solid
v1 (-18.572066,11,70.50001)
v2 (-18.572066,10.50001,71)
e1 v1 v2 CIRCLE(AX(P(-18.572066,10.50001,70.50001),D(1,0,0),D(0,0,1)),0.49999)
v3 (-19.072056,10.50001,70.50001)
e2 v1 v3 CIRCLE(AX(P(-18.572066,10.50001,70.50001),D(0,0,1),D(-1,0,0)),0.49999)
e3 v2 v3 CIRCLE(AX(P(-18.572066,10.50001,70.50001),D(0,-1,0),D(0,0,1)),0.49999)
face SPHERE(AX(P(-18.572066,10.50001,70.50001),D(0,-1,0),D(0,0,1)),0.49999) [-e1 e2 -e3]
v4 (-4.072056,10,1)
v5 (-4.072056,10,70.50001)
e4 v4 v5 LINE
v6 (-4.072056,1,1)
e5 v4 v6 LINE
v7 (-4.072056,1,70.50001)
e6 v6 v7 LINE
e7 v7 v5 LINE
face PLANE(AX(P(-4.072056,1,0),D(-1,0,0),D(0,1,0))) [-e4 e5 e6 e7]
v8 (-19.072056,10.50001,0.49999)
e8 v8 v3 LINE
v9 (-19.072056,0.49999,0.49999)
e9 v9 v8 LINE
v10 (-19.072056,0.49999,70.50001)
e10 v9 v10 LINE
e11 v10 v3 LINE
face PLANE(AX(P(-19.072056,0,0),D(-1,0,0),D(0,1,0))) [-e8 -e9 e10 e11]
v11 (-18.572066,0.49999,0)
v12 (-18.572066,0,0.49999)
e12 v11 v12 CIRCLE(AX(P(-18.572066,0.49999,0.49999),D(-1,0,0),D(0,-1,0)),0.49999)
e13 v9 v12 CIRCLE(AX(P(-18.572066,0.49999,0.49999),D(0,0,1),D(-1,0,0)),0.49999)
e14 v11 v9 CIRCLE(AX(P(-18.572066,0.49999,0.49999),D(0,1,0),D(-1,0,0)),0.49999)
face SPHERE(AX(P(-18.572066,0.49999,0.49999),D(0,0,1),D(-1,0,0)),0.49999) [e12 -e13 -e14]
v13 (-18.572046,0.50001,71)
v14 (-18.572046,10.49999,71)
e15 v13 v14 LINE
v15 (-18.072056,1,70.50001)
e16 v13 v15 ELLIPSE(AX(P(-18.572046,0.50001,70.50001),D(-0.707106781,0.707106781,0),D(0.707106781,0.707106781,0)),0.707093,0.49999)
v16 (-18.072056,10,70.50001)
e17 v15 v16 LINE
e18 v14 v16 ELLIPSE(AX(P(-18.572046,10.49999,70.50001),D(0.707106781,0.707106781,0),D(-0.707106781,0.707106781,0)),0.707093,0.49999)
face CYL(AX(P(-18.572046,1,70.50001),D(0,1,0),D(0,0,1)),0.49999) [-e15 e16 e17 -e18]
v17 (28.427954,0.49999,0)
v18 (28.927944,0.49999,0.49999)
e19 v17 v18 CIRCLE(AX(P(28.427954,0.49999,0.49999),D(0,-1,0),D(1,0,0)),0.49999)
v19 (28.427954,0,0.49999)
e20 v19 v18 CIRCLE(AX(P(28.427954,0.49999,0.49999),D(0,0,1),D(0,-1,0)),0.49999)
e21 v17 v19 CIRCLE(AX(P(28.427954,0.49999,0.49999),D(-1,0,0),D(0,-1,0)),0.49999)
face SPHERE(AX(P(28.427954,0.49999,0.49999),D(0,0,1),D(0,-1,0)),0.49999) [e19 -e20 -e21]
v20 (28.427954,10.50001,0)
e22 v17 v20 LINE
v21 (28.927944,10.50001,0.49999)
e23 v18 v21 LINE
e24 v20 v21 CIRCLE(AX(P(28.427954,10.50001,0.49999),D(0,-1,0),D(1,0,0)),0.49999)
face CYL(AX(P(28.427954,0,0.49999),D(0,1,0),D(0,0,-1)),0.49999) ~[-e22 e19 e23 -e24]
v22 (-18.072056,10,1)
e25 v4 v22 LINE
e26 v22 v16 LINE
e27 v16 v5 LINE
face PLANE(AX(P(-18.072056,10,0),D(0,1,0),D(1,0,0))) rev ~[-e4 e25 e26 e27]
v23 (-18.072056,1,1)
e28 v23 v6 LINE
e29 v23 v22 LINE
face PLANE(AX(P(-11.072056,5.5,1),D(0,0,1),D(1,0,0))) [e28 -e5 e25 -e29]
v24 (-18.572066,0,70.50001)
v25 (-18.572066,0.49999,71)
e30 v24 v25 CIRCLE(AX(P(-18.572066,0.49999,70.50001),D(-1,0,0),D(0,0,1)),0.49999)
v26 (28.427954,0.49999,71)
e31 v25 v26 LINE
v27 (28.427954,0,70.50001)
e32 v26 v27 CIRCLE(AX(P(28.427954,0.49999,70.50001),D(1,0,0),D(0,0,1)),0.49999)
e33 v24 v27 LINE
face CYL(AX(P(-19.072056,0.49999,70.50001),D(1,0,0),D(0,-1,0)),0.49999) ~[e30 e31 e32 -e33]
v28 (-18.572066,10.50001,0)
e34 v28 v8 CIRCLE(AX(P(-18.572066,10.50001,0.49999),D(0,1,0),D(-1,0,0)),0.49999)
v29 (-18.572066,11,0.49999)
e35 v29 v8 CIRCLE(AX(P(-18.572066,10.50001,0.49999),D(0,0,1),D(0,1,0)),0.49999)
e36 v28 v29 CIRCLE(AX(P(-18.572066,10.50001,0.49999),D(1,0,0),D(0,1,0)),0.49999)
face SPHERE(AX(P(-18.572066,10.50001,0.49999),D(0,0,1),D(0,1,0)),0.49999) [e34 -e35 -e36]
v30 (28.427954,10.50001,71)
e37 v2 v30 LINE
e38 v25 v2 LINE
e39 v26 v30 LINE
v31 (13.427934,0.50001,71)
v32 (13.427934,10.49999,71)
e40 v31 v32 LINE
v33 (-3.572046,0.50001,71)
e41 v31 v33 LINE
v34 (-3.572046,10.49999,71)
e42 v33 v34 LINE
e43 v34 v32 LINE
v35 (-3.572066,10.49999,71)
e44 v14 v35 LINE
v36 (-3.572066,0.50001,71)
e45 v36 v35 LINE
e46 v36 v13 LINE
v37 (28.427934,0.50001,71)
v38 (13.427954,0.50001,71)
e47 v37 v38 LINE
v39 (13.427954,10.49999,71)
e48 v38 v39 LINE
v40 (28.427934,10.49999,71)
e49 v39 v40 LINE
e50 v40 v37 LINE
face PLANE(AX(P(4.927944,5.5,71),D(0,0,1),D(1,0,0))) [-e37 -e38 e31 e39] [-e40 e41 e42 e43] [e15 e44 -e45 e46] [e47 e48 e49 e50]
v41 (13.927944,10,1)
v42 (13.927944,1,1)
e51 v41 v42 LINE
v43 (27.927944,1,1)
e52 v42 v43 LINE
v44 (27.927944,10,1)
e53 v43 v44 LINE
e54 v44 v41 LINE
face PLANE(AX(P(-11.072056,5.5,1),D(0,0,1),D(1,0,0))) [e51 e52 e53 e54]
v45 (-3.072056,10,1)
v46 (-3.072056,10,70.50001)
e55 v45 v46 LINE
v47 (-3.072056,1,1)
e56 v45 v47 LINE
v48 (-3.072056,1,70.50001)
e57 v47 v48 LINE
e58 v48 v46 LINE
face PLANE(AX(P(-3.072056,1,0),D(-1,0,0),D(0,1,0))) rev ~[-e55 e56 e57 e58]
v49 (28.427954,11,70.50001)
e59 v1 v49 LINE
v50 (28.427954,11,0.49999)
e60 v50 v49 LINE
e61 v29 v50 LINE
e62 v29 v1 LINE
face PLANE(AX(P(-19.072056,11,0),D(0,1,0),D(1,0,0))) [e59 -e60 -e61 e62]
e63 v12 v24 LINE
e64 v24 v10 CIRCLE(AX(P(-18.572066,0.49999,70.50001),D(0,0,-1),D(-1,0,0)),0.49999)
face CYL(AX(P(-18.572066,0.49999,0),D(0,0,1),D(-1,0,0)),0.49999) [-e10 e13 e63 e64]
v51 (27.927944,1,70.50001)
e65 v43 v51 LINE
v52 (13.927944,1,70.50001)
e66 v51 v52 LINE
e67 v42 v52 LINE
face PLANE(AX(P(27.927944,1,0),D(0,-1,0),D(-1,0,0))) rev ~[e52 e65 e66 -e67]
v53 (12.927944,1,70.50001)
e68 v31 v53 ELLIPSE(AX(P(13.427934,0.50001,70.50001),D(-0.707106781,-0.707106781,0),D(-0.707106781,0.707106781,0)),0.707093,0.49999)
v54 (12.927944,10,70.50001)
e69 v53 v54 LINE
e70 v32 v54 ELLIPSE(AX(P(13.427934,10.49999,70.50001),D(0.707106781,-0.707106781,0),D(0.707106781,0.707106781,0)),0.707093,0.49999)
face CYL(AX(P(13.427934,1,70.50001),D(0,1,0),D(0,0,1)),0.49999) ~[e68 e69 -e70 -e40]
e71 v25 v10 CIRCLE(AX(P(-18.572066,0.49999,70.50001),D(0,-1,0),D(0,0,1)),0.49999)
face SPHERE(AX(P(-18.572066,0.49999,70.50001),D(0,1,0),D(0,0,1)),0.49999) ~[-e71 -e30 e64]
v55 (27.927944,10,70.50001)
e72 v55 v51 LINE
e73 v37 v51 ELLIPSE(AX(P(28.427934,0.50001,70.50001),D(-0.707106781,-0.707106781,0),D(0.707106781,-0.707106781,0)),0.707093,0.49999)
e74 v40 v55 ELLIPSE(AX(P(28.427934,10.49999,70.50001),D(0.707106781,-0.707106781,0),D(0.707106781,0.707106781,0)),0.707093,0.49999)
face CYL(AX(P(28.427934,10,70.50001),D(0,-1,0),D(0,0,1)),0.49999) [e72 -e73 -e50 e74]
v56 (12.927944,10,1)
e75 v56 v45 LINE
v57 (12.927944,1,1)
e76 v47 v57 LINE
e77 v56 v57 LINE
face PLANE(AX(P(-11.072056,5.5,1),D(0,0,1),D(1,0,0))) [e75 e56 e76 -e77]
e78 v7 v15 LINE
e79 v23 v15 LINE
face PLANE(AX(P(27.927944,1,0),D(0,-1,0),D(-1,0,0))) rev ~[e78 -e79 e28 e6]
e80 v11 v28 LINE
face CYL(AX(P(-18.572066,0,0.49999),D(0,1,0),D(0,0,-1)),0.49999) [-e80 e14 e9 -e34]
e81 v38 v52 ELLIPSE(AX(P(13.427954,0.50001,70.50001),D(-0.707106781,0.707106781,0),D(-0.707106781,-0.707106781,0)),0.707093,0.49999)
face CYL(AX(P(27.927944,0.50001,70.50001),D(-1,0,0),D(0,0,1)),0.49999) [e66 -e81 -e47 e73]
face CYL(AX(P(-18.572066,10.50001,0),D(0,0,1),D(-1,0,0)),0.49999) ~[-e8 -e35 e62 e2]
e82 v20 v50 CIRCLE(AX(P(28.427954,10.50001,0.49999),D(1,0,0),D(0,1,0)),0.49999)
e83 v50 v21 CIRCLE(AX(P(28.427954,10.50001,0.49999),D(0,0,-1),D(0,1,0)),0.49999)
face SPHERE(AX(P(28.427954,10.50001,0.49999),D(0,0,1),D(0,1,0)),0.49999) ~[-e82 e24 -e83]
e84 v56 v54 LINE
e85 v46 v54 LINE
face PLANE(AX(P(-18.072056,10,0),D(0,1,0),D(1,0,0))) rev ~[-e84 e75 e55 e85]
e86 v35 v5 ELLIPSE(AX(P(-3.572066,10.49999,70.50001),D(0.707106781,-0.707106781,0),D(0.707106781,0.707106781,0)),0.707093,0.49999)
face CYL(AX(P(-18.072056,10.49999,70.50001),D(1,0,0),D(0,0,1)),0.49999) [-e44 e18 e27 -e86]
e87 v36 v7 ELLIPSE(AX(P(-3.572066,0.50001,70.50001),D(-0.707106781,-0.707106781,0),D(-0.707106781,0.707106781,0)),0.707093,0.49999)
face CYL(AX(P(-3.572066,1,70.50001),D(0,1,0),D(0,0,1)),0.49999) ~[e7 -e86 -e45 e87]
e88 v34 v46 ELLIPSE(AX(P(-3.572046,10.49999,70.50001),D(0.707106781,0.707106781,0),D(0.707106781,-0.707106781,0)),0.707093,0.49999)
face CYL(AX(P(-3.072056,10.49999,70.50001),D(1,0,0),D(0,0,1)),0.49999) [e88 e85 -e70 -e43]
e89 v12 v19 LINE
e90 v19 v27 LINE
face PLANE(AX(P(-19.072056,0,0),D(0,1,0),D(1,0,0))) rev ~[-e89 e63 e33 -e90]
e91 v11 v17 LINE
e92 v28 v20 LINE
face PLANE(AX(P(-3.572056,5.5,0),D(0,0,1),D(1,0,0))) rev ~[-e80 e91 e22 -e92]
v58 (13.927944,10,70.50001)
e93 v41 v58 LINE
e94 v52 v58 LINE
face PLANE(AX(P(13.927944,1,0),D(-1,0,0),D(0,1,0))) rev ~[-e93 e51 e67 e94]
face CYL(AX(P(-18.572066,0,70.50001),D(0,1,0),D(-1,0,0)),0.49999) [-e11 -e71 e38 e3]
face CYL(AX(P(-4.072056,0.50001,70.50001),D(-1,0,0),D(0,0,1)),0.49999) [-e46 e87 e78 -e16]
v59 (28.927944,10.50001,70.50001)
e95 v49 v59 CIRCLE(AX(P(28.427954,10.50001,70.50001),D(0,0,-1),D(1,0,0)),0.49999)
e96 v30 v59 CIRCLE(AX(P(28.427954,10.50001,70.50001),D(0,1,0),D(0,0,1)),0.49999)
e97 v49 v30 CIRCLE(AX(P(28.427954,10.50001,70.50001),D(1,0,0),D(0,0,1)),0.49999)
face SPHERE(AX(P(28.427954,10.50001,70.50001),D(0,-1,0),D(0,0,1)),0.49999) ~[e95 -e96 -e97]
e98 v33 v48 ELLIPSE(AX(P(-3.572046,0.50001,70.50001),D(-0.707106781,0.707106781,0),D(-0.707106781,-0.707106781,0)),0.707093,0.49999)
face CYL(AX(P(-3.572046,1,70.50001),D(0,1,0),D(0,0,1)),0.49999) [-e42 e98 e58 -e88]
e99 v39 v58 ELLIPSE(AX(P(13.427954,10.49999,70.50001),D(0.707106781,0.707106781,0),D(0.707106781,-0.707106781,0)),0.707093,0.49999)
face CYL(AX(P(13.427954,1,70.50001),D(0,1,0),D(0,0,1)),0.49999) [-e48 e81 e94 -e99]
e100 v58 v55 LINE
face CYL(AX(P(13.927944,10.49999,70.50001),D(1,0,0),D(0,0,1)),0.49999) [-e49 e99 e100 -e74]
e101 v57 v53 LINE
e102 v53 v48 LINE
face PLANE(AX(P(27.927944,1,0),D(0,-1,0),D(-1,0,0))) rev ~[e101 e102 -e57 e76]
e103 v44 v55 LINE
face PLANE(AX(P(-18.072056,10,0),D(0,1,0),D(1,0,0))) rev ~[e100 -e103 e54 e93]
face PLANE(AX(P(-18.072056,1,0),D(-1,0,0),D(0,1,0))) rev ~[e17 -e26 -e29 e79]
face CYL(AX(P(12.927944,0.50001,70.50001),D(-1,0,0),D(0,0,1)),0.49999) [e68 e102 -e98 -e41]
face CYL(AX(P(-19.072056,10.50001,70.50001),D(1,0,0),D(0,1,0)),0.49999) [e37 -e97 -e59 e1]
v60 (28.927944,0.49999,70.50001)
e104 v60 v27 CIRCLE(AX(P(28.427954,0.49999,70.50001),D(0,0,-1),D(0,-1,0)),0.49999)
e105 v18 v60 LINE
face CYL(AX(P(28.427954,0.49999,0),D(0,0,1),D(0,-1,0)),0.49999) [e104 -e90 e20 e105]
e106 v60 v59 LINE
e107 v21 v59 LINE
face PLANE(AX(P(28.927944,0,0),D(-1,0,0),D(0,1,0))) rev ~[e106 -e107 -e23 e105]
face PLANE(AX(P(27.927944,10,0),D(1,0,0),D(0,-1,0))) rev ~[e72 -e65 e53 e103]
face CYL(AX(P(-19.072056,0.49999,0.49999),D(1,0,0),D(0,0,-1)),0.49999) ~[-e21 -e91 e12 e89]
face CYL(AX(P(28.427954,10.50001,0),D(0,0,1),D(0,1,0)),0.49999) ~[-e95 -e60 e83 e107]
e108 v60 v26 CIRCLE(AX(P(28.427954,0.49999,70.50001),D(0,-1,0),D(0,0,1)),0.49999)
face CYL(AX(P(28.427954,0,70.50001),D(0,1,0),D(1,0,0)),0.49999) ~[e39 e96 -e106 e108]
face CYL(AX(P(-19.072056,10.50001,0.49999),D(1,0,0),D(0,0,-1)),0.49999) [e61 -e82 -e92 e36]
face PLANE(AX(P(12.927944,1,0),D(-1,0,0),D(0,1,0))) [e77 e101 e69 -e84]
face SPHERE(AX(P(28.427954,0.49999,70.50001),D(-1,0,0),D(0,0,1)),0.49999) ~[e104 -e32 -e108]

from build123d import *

# Parameters (mm, degrees)
F0_W     = 14
F0_H     = 9
F0_W_2   = 1
F0_W_3   = 16
F1_DEPTH = 1
F0_W_4   = 48
F0_H_2   = 11
F2_DEPTH = 71
F3_DEPTH = 71
F4_R     = 0.49999


# Not quite as in the source:
# - a fillet or chamfer is up to 0.001 mm smaller than in the source, because OpenCascade refuses the exact size


with BuildPart() as f1:
    # F0 (on Top) → F1 (new body)
    with BuildSketch(Plane.XY):
        with Locations((-11.0720558167, 5.5)):
            Rectangle(F0_W, F0_H)
        with Locations((-3.5720558167, 5.5)):
            Rectangle(F0_W_2, F0_H)
        with Locations((4.9279441833, 5.5)):
            Rectangle(F0_W_3, F0_H)
        with Locations((13.4279441833, 5.5)):
            Rectangle(F0_W_2, F0_H)
        with Locations((20.9279441833, 5.5)):
            Rectangle(F0_W, F0_H)
    extrude(amount=F1_DEPTH)

    # F0 (on Top) → F2 (join)
    with BuildSketch(Plane.XY):
        with Locations((4.9279441833, 5.5)):
            Rectangle(F0_W_4, F0_H_2)
        Polygon((-18.0720558167, 1), (-18.0720558167, 10), (-4.0720558167, 10), (-3.0720558167, 10), (12.9279441833, 10), (13.9279441833, 10), (27.9279441833, 10), (27.9279441833, 1), (13.9279441833, 1), (12.9279441833, 1), (-3.0720558167, 1), (-4.0720558167, 1), align=None, mode=Mode.SUBTRACT)
    extrude(amount=F2_DEPTH)

    # F0 (on Top) → F3 (join)
    with BuildSketch(Plane.XY):
        with Locations((-3.5720558167, 5.5)):
            Rectangle(F0_W_2, F0_H)
        with Locations((13.4279441833, 5.5)):
            Rectangle(F0_W_2, F0_H)
    extrude(amount=F3_DEPTH)

    # F4 (radius 0.5 in the source; OpenCascade refuses exactly that, so slightly less here)
    f4_edges = [f1.edges().sort_by_distance(p)[0] for p in [
        (-19.072056, 5.5, 71),
        (4.927944, 0, 71),
        (28.927944, 5.5, 71),
        (4.927944, 11, 71),
        (-18.072056, 5.5, 71),
        (-11.072056, 10, 71),
        (-4.072056, 5.5, 71),
        (-11.072056, 1, 71),
        (20.927944, 10, 71),
        (27.927944, 5.5, 71),
        (20.927944, 1, 71),
        (13.927944, 5.5, 71),
        (4.927944, 10, 71),
        (12.927944, 5.5, 71),
        (4.927944, 1, 71),
        (-3.072056, 5.5, 71),
        (28.927944, 11, 35.5),
        (-19.072056, 11, 35.5),
        (4.927944, 11, 0),
        (-19.072056, 0, 35.5),
        (-19.072056, 5.5, 0),
        (28.927944, 0, 35.5),
        (4.927944, 0, 0),
        (28.927944, 5.5, 0),
    ]]
    fillet(f4_edges, radius=F4_R)


solid = f1.part
